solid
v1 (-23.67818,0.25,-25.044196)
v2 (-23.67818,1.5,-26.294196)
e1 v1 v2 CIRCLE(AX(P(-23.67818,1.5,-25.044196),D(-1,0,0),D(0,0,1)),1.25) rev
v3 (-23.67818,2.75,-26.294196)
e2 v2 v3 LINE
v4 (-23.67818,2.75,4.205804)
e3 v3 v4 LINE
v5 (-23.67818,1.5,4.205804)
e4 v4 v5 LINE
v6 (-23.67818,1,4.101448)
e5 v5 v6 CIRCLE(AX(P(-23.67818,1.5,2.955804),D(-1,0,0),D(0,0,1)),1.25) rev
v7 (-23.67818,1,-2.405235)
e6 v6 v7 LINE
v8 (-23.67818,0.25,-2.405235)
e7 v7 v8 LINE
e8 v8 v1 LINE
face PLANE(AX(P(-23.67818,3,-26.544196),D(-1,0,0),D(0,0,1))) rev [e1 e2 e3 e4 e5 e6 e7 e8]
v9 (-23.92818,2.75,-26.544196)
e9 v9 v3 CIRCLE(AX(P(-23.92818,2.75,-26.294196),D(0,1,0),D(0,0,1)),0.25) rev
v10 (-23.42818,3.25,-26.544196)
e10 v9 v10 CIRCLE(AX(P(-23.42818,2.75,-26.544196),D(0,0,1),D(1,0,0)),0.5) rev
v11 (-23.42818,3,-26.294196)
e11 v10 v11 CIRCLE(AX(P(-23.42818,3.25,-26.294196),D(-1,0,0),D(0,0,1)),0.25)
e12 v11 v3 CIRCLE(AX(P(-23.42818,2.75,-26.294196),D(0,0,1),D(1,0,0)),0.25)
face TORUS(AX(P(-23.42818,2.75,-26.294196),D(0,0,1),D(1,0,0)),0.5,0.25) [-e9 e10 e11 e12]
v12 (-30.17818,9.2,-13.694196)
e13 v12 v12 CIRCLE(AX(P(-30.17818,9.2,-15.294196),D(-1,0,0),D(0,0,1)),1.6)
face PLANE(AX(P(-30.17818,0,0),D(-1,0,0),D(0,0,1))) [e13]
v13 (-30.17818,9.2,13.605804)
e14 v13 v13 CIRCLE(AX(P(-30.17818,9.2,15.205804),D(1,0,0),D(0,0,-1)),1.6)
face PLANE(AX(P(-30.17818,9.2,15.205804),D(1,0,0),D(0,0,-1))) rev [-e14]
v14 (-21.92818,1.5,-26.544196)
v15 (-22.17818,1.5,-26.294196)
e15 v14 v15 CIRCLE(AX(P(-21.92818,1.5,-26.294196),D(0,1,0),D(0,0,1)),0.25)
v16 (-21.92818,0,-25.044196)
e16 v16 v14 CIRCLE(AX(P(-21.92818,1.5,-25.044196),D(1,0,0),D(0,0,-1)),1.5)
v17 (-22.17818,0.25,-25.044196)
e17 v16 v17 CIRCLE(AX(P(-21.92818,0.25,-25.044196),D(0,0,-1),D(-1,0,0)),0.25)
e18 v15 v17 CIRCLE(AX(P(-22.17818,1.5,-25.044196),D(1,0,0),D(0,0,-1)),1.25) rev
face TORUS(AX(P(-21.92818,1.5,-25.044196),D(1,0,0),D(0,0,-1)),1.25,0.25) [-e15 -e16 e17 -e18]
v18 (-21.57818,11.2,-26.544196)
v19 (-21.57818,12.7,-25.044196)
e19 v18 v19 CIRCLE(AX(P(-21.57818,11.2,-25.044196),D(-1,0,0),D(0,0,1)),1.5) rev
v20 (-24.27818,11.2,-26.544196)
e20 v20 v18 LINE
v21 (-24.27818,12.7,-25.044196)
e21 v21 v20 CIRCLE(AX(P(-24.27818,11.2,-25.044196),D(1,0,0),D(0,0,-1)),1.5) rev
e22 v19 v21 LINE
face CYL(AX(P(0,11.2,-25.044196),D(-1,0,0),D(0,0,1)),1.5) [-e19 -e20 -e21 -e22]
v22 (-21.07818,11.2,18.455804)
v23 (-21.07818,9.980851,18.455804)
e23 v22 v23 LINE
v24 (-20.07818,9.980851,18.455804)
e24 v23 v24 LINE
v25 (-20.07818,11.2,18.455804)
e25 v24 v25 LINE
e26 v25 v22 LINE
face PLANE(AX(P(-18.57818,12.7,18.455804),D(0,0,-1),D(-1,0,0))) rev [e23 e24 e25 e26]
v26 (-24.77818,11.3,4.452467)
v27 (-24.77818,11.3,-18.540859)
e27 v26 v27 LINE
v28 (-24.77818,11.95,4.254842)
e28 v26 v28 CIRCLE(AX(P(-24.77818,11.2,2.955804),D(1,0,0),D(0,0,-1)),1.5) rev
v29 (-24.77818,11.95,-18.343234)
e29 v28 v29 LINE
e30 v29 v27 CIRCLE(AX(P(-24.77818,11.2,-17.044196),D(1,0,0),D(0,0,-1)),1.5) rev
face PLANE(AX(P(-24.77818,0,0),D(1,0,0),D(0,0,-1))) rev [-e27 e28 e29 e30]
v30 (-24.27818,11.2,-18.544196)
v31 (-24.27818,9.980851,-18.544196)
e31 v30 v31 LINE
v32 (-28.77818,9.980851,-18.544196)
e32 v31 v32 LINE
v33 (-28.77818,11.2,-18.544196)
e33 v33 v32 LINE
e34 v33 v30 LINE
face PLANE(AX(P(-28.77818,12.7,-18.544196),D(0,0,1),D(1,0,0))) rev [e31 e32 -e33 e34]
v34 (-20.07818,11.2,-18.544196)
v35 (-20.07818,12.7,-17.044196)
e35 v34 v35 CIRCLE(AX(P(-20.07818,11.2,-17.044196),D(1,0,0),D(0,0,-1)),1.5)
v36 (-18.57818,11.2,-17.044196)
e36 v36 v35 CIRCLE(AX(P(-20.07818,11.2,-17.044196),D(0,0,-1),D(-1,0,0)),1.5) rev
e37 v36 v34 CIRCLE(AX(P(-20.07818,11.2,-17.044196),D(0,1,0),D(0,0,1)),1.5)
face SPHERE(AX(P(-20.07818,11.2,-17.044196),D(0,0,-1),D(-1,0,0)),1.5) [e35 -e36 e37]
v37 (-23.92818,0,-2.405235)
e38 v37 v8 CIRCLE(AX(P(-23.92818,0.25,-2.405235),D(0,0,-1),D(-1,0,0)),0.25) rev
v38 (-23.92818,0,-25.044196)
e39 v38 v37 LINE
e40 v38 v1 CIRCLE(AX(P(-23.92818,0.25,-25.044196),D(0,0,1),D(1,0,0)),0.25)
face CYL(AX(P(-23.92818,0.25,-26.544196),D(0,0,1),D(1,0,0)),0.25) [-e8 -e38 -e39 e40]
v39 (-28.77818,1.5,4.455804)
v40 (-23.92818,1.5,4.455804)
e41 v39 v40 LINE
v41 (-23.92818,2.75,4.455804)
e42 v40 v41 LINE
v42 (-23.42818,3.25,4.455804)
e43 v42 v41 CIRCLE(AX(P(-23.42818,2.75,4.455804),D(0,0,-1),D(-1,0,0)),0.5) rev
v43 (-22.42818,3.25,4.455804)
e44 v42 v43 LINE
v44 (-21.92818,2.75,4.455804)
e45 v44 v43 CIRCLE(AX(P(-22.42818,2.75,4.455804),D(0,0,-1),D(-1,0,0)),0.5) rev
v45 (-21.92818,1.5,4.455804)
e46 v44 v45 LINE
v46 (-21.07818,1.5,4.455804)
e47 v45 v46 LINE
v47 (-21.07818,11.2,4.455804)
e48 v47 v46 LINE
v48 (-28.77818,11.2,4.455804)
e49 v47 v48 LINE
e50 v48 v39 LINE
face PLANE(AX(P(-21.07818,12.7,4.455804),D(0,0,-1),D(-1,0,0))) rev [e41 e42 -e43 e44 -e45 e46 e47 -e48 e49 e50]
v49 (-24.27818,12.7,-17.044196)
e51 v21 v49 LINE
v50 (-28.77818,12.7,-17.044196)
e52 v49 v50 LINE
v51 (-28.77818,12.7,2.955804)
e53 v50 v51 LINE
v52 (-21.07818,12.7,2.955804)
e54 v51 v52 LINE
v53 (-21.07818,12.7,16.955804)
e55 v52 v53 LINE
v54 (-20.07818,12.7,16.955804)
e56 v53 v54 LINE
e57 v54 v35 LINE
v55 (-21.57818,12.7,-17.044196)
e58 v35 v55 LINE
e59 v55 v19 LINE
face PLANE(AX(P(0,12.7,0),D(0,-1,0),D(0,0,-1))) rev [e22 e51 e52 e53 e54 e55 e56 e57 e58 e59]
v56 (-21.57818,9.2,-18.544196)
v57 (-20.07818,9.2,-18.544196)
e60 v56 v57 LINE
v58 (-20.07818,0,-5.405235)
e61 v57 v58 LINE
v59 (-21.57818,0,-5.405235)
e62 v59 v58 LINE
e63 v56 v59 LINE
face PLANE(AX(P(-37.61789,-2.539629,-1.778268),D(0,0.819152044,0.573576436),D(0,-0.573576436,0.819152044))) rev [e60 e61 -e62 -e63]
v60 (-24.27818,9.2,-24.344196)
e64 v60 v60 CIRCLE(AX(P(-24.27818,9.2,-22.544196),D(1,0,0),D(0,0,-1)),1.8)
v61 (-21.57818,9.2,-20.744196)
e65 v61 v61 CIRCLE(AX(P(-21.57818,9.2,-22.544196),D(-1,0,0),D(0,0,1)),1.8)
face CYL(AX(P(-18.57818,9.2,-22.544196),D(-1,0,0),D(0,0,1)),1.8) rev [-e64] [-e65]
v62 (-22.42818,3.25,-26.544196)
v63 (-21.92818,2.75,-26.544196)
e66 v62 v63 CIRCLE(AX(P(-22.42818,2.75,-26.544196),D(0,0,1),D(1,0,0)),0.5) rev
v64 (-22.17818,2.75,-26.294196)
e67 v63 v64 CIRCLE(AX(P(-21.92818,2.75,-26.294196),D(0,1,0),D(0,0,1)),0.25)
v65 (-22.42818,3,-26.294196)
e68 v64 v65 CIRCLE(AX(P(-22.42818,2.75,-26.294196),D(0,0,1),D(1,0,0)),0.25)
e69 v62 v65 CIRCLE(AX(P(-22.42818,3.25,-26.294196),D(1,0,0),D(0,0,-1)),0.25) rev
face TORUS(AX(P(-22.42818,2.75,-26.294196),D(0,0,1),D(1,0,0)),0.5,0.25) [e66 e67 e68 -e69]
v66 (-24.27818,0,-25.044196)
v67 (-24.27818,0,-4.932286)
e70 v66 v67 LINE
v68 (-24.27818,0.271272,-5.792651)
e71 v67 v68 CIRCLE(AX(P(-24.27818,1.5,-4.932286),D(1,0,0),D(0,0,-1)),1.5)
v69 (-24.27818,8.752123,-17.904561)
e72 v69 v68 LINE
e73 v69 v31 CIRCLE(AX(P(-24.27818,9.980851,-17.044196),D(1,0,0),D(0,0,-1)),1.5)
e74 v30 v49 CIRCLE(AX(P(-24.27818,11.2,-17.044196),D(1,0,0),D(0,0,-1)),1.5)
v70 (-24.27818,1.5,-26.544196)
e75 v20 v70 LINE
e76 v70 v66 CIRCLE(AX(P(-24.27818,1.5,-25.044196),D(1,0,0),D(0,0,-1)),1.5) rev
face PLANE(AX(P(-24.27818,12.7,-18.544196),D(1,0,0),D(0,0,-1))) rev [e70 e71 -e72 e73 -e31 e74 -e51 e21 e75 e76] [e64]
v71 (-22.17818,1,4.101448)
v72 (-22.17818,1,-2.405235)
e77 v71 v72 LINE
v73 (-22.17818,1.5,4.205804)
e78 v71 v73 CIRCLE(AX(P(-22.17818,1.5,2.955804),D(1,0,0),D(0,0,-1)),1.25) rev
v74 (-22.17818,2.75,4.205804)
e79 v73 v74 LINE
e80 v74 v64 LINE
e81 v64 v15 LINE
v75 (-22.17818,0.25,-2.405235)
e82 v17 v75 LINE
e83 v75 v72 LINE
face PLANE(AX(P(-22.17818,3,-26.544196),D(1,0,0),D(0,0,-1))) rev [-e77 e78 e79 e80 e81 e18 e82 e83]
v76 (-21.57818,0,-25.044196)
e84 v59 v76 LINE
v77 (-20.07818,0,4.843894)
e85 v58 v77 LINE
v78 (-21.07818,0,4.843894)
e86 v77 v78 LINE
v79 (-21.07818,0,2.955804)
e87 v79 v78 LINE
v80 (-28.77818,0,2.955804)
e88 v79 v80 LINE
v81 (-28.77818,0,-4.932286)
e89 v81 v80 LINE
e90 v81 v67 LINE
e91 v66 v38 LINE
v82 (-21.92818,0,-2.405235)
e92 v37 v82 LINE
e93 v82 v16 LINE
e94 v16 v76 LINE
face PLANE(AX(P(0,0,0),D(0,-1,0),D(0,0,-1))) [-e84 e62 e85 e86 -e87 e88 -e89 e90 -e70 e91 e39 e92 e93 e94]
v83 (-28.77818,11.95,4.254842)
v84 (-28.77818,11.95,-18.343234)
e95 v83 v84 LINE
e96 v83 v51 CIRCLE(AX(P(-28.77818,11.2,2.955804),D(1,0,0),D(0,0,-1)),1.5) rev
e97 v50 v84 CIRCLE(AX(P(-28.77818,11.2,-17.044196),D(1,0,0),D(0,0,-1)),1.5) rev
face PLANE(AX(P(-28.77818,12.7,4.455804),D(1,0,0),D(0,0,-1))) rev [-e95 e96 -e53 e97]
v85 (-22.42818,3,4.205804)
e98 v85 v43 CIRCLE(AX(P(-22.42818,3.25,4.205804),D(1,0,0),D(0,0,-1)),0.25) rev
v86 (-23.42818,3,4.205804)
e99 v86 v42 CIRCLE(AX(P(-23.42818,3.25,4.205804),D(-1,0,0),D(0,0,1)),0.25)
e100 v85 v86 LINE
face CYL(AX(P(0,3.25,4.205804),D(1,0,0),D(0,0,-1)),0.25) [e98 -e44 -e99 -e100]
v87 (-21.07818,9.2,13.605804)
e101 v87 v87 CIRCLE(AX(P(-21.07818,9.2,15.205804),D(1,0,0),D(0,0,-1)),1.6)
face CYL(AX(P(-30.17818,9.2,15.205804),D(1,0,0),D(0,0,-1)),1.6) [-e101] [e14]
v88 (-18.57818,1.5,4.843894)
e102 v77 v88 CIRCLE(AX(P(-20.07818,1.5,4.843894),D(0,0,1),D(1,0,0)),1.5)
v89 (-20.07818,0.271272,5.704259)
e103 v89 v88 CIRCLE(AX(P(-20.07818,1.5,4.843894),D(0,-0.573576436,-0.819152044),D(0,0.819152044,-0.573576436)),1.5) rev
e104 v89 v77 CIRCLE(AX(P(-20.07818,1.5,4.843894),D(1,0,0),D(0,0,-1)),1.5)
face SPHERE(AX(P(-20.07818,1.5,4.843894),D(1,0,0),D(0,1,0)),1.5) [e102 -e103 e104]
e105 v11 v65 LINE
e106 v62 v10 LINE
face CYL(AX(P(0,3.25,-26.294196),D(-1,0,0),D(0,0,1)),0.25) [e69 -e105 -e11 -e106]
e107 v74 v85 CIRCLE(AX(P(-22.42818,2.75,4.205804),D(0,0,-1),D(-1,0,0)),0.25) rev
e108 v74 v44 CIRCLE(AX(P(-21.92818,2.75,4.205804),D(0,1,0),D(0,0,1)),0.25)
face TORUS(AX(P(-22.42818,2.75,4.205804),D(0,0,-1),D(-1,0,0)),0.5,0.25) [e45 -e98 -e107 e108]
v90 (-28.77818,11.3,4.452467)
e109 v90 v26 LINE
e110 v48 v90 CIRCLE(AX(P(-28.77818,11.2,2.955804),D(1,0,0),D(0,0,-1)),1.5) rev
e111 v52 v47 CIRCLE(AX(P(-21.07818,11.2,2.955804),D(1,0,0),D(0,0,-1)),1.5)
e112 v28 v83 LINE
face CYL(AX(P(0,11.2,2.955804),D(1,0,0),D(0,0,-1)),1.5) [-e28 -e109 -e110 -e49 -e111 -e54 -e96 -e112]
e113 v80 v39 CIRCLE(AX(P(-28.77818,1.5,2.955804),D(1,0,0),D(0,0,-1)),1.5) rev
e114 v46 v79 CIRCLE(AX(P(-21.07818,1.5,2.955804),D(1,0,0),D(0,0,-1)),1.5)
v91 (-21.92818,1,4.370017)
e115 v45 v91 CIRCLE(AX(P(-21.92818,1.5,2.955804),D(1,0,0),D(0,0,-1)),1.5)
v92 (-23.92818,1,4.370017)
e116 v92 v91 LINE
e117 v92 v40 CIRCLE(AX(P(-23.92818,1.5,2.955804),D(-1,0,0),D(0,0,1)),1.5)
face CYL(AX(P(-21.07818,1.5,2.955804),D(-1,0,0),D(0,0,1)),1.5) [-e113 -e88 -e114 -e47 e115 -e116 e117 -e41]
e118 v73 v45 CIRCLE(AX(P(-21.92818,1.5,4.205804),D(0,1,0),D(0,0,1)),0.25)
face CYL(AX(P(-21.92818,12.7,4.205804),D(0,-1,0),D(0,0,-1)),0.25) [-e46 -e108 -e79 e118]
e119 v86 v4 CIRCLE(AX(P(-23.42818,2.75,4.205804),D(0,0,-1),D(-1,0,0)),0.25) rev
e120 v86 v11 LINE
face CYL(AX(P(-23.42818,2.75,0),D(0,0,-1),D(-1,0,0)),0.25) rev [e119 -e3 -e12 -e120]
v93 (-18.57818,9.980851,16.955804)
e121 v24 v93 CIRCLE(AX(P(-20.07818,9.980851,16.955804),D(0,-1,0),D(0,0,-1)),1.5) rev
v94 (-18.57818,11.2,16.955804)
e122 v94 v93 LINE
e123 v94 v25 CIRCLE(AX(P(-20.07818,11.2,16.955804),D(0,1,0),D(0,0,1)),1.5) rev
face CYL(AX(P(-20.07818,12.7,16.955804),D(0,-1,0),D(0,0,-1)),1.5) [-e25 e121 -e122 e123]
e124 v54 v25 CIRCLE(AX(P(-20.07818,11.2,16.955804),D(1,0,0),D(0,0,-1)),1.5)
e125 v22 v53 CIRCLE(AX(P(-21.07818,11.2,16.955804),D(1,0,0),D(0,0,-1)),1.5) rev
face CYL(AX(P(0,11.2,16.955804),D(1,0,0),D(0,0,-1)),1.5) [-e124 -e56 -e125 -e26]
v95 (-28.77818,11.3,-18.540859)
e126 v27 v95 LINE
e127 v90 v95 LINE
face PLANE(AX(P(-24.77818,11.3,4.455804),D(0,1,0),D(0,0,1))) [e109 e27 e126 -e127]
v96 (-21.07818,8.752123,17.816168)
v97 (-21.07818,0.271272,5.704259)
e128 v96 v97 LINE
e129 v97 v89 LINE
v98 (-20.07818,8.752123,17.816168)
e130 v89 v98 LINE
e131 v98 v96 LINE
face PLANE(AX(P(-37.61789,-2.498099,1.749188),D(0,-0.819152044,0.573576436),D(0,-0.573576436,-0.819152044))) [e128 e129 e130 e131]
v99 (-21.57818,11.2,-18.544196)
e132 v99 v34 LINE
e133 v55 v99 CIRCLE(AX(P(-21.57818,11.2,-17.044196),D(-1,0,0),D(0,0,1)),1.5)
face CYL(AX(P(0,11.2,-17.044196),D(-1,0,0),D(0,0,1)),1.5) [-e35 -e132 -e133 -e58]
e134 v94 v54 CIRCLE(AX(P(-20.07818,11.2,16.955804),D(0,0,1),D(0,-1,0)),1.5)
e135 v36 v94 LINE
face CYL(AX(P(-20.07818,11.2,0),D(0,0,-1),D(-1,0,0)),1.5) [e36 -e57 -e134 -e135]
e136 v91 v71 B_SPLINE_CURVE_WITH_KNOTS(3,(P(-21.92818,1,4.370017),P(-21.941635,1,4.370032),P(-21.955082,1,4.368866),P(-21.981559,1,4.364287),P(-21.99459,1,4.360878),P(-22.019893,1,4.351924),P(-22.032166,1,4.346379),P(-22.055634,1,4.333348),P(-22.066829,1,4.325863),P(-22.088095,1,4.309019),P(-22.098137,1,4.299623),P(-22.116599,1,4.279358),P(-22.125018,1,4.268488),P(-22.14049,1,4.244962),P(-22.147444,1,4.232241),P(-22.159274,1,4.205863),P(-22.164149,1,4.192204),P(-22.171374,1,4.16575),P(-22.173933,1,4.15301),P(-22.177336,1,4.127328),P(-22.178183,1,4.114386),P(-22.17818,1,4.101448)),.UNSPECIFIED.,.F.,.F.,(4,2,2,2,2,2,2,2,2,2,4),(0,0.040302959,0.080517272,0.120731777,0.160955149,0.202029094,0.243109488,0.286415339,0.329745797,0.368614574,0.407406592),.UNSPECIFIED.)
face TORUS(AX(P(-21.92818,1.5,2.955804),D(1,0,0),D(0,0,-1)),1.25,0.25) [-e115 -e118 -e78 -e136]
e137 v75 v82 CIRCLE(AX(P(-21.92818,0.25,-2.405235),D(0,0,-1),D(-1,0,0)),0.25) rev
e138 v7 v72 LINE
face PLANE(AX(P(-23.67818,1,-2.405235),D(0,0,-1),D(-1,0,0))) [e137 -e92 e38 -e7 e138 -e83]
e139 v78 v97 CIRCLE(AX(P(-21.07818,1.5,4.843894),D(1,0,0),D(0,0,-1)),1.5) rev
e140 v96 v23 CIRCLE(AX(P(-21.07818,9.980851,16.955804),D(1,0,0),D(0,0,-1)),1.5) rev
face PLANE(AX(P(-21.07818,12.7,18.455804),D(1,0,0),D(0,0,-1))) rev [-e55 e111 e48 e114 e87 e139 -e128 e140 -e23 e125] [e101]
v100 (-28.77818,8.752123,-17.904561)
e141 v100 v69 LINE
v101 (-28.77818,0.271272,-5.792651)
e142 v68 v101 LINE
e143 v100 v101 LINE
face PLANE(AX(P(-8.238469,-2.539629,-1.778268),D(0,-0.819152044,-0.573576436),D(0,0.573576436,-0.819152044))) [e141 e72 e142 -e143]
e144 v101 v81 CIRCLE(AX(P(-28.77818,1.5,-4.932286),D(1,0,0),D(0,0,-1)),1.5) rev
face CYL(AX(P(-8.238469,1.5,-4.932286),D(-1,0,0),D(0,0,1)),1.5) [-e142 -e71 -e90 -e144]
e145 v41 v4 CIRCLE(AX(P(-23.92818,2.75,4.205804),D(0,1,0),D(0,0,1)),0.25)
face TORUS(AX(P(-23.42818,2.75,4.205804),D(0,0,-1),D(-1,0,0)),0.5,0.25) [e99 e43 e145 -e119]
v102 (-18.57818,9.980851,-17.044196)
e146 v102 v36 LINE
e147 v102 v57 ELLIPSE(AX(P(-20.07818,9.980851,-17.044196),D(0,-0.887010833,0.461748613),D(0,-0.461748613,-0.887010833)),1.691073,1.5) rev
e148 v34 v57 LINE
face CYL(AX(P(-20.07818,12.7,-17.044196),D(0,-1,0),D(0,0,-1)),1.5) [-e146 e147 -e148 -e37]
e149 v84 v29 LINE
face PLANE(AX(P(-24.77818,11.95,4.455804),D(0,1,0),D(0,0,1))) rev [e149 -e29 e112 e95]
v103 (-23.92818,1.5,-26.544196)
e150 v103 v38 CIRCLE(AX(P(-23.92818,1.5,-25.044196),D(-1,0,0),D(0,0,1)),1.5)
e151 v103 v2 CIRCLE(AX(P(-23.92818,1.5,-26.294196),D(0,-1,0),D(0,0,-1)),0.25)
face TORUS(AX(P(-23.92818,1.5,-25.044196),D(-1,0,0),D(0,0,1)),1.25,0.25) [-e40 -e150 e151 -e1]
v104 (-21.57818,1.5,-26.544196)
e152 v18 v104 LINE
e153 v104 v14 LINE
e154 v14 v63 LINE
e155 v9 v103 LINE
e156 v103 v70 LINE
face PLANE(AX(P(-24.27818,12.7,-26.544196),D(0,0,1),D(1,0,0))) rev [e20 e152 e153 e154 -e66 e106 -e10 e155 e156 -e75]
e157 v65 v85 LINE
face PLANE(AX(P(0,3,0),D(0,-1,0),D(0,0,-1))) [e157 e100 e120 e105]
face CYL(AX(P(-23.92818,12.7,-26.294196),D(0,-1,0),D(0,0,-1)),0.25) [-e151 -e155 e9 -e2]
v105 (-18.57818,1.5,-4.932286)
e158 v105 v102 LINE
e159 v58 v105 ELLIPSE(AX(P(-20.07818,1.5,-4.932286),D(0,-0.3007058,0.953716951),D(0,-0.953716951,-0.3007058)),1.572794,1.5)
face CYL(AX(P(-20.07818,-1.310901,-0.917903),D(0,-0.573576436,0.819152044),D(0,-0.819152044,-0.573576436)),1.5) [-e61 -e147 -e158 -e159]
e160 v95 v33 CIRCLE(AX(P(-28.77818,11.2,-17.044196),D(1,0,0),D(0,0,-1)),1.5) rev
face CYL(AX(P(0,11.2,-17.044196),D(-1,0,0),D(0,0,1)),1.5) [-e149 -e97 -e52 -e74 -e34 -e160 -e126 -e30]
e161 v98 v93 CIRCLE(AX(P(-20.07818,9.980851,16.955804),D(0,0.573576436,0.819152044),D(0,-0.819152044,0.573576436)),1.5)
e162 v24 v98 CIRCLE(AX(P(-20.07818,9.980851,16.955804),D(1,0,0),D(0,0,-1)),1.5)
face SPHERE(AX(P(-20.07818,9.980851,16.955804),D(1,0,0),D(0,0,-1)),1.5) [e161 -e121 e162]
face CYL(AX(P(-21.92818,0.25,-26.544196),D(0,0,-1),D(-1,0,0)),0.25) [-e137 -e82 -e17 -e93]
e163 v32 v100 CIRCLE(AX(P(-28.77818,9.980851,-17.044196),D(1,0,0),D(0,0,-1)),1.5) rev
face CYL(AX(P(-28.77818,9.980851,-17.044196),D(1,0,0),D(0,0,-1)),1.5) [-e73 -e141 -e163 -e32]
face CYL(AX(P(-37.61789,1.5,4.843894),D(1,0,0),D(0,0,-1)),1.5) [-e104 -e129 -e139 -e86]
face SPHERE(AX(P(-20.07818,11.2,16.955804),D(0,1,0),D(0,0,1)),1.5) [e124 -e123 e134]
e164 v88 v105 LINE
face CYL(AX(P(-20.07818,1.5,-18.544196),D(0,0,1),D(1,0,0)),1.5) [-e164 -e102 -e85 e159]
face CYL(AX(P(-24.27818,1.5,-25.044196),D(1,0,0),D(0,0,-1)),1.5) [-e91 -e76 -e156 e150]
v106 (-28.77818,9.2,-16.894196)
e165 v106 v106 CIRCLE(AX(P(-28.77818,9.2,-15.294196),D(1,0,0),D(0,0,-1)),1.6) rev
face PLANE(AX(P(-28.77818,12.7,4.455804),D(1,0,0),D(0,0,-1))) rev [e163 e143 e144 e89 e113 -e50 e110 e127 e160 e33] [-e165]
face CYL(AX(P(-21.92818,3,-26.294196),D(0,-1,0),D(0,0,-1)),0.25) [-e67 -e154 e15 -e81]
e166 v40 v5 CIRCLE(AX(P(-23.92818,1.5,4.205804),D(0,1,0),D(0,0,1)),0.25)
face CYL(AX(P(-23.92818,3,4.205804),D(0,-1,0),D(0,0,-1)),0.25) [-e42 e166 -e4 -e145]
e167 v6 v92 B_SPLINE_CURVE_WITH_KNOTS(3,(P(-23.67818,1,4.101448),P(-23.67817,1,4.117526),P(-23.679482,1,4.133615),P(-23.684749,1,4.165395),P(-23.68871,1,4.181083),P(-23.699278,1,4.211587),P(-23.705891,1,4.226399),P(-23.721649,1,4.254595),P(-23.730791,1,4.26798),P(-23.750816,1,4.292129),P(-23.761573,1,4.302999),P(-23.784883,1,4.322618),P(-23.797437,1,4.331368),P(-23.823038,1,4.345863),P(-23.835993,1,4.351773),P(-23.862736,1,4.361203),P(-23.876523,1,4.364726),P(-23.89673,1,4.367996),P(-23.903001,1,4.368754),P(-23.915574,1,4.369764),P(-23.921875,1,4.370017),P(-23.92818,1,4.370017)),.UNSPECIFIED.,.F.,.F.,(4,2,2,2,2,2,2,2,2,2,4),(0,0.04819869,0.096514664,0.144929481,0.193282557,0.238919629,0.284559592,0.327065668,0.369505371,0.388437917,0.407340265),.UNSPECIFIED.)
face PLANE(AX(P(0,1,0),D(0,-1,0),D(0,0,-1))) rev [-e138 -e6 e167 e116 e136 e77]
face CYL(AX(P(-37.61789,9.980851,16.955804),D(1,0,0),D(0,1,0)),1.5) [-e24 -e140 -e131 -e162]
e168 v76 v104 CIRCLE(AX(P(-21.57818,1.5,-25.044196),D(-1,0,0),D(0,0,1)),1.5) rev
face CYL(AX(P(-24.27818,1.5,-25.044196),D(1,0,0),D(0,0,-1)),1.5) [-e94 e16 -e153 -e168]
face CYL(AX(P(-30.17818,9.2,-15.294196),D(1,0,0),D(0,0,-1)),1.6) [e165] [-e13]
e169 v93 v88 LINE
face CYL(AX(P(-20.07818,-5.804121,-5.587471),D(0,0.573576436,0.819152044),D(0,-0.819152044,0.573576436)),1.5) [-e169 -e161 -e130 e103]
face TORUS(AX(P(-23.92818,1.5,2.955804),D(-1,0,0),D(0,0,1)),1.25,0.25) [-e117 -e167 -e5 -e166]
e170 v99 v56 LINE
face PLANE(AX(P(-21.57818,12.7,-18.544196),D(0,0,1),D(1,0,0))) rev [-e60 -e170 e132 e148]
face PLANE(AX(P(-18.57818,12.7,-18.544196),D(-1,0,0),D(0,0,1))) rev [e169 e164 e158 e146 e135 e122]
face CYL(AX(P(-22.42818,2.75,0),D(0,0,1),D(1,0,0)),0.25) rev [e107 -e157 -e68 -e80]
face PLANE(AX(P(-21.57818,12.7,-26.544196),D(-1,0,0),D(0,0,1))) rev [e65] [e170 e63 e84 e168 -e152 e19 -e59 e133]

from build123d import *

# Parameters (mm, degrees)
BOSS_EXTRUDE1_DEPTH = 12.7
CUT_EXTRUDE2_DEPTH  = 4.5
CUT_EXTRUDE3_DEPTH  = 32.143608507
BOSS_EXTRUDE2_START = -7.7
SKETCH2_5_R         = 1.6
BOSS_EXTRUDE2_DEPTH = 9.1
SKETCH2_6_R         = 1.8
CUT_EXTRUDE4_DEPTH  = 32.143608507
SKETCH2_7_R         = 1.6
BOSS_EXTRUDE3_DEPTH = 1.4
SKETCH2_8_W         = 45
SKETCH2_8_H         = 0.65
CUT_EXTRUDE5_DEPTH  = 4
CUT_EXTRUDE6_REACH  = 33.63
SKETCH4_W           = 1.5
SKETCH4_H           = 31
CUT_EXTRUDE7_DEPTH  = 3
SKETCH6_W           = 2.1
SKETCH6_H           = 6.861038338
BOSS_EXTRUDE4_DEPTH = 1
CUT_EXTRUDE8_DEPTH  = 4.5
FILLET1_R           = 1.5
FILLET2_R           = 0.25


with BuildPart() as part:
    # Sketch1 → Boss-Extrude1 (new body)
    with BuildSketch(Plane(origin=(0, 0, 0), x_dir=(1, 0, 0), z_dir=(0, 1, 0))):
        Polygon((-28.77817965, 18.54419618), (-24.27817965, 18.54419618), (-24.27817965, 26.54419618), (-21.57817965, 26.54419618), (-21.57817965, 18.54419618), (-18.57817965, 18.54419618), (-18.57817965, -18.45580382), (-21.07817965, -18.45580382), (-21.07817965, -4.45580382), (-28.77817965, -4.45580382), align=None)
    extrude(amount=BOSS_EXTRUDE1_DEPTH)

    # Sketch2 → Cut-Extrude2 (cut)
    with BuildSketch(Plane.ZY.offset(28.77817965)):
        Polygon((-18.54419618, 5.764870839), (-18.54419618, 0), (-7.040359819, 0), align=None)
    extrude(amount=-CUT_EXTRUDE2_DEPTH, mode=Mode.SUBTRACT)

    # Sketch2<4> → Cut-Extrude3 (cut, through all)
    with BuildSketch(Plane.ZY.offset(28.77817965)):
        Polygon((15.124702683, 0), (18.45580382, 0), (18.45580382, 9.2), align=None)
    extrude(amount=-CUT_EXTRUDE3_DEPTH, mode=Mode.SUBTRACT)

    # Sketch2<5> → Boss-Extrude2 (add)
    with BuildSketch(Plane.ZY.offset(28.77817965).offset(BOSS_EXTRUDE2_START)):
        with Locations(Location((15.20580382, 9.2, 0), (0, 0, 180))):
            Circle(SKETCH2_5_R)
    extrude(amount=BOSS_EXTRUDE2_DEPTH)

    # Sketch2<6> → Cut-Extrude4 (cut, through all)
    with BuildSketch(Plane.ZY.offset(28.77817965)):
        with Locations((-22.54419618, 9.2)):
            Circle(SKETCH2_6_R)
    extrude(amount=-CUT_EXTRUDE4_DEPTH, mode=Mode.SUBTRACT)

    # Sketch2<7> → Boss-Extrude3 (add)
    with BuildSketch(Plane.ZY.offset(28.77817965)):
        with Locations(Location((-15.29419618, 9.2, 0), (0, 0, 180))):
            Circle(SKETCH2_7_R)
    extrude(amount=BOSS_EXTRUDE3_DEPTH)

    # Sketch2<8> → Cut-Extrude5 (cut)
    with BuildSketch(Plane.ZY.offset(28.77817965)):
        with Locations((-4.04419618, 11.625)):
            Rectangle(SKETCH2_8_W, SKETCH2_8_H)
    extrude(amount=-CUT_EXTRUDE5_DEPTH, mode=Mode.SUBTRACT)

    # Cut-Extrude6: up to this face of the body (flat: up to its plane)
    cut_extrude6_end = Plane(part.part.faces().sort_by_distance((-21.57817965, 6.032683514, -22.54419618))[0])
    # Sketch3 → Cut-Extrude6 (cut, up to the picked face)
    with BuildSketch(Plane(origin=(-18.57817965, 0, 0), x_dir=(0, 0, -1), z_dir=(1, 0, 0)), mode=Mode.PRIVATE) as cut_extrude6_sk1:
        Polygon((18.54419618, 0), (18.54419618, 9.2), (5.405234518, 0), align=None)
    cut_extrude6_tool1 = split(extrude(cut_extrude6_sk1.sketch, amount=-CUT_EXTRUDE6_REACH, mode=Mode.PRIVATE), bisect_by=cut_extrude6_end, keep=Keep.BOTH, mode=Mode.PRIVATE)
    # Sketch3 → Cut-Extrude6 (cut, up to the picked face)
    with BuildSketch(Plane(origin=(-18.57817965, 0, 0), x_dir=(0, 0, -1), z_dir=(1, 0, 0)), mode=Mode.PRIVATE) as cut_extrude6_sk2:
        Polygon((-15.124702683, 0), (-18.45580382, 9.2), (-18.45580382, 0), align=None)
    cut_extrude6_tool2 = split(extrude(cut_extrude6_sk2.sketch, amount=-CUT_EXTRUDE6_REACH, mode=Mode.PRIVATE), bisect_by=cut_extrude6_end, keep=Keep.BOTH, mode=Mode.PRIVATE)
    # Sketch3 → Cut-Extrude6 (cut, up to the picked face)
    with BuildSketch(Plane(origin=(-18.57817965, 0, 0), x_dir=(0, 0, -1), z_dir=(1, 0, 0)), mode=Mode.PRIVATE) as cut_extrude6_sk3:
        Polygon((-5.316842158, 0), (-18.45580382, 9.2), (-15.124702683, 0), align=None)
    cut_extrude6_tool3 = split(extrude(cut_extrude6_sk3.sketch, amount=-CUT_EXTRUDE6_REACH, mode=Mode.PRIVATE), bisect_by=cut_extrude6_end, keep=Keep.BOTH, mode=Mode.PRIVATE)
    add(cut_extrude6_tool1.solids().sort_by(Axis((-18.57818, 3.066667, -14.164542), (-1, 0, 0)))[0], mode=Mode.SUBTRACT)
    add(cut_extrude6_tool2.solids().sort_by(Axis((-18.57818, 3.066667, 17.345437), (-1, 0, 0)))[0], mode=Mode.SUBTRACT)
    add(cut_extrude6_tool3.solids().sort_by(Axis((-18.57818, 3.066667, 12.965783), (-1, 0, 0)))[0], mode=Mode.SUBTRACT)

    # Sketch4 → Cut-Extrude7 (cut)
    with BuildSketch(Plane.XZ):
        with Locations((-22.92817965, -11.04419618)):
            Rectangle(SKETCH4_W, SKETCH4_H)
    extrude(amount=-CUT_EXTRUDE7_DEPTH, mode=Mode.SUBTRACT)

    # Sketch6 → Boss-Extrude4 (add)
    with BuildSketch(Plane(origin=(0, 0, 0), x_dir=(-1, 0, 0), z_dir=(0, -1, 0))):
        with Locations((22.62817965, -1.025284651)):
            Rectangle(SKETCH6_W, SKETCH6_H)
    extrude(amount=-BOSS_EXTRUDE4_DEPTH)

    # Sketch8 → Cut-Extrude8 (cut)
    with BuildSketch(Plane.ZY.offset(28.77817965)):
        Polygon((-18.54419618, 0), (-7.040359819, 0), (-18.54419618, 5.764870839), align=None)
        Polygon((-7.040359819, 0), (-5.405234518, 0), (-18.54419618, 9.2), (-18.54419618, 5.764870839), align=None)
    extrude(amount=-CUT_EXTRUDE8_DEPTH, mode=Mode.SUBTRACT)

    # Fillet1
    # the kernel refuses this fillet: 1.5 mm, written as the material it takes off along each edge
    with BuildSketch(Plane(origin=(-20.07817965, 9.980850576, 16.95580382), x_dir=(0, 0, 1), z_dir=(1, 0, 0))) as fillet1_piece_1_section:
        Polygon((0, 0), (FILLET1_R, 0), (FILLET1_R, FILLET1_R * 0.520567050552), (FILLET1_R * 0.573576436351, FILLET1_R * 0.819152044289), align=None)
    fillet1_piece_1 = extrude(amount=FILLET1_R, mode=Mode.PRIVATE)
    fillet1_piece_1 = fillet1_piece_1 - Plane(origin=(-20.07817965, 9.980850576, 16.95580382), x_dir=(0, 0.4617486132350316, -0.8870108331782229), z_dir=(1, 0, 0)) * Sphere(FILLET1_R, mode=Mode.PRIVATE)
    add(fillet1_piece_1, mode=Mode.SUBTRACT)
    with BuildSketch(Plane(origin=(-20.07817965, 11.2, 16.95580382), x_dir=(1, 0, 0), z_dir=(0, 1, 0))) as fillet1_piece_2_section:
        Polygon((0, 0), (FILLET1_R, 0), (FILLET1_R, -FILLET1_R), (0, -FILLET1_R), align=None)
    fillet1_piece_2 = extrude(amount=FILLET1_R, mode=Mode.PRIVATE)
    fillet1_piece_2 = fillet1_piece_2 - Plane(origin=(-20.07817965, 11.2, 16.95580382), x_dir=(-0.7071067811865476, 0, -0.7071067811865475), z_dir=(0, 1, 0)) * Sphere(FILLET1_R, mode=Mode.PRIVATE)
    add(fillet1_piece_2, mode=Mode.SUBTRACT)
    with BuildSketch(Plane(origin=(-20.07817965, 1.5, 4.843893974), x_dir=(0, -0.8191520442889888, 0.5735764363510504), z_dir=(1, 0, 0))) as fillet1_piece_3_section:
        Polygon((0, 0), (FILLET1_R, 0), (FILLET1_R, FILLET1_R * 0.315298788879), (FILLET1_R * 0.819152044289, FILLET1_R * 0.573576436351), align=None)
    fillet1_piece_3 = extrude(amount=FILLET1_R, mode=Mode.PRIVATE)
    fillet1_piece_3 = fillet1_piece_3 - Plane(origin=(-20.07817965, 1.5, 4.843893974), x_dir=(0, 0.9537169507482262, -0.3007057995042756), z_dir=(1, 0, 0)) * Sphere(FILLET1_R, mode=Mode.PRIVATE)
    add(fillet1_piece_3, mode=Mode.SUBTRACT)
    with BuildSketch(Plane(origin=(-20.07817965, 11.2, -17.04419618), x_dir=(1, 0, 0), z_dir=(0, 1, 0))) as fillet1_piece_4_section:
        Polygon((0, 0), (FILLET1_R, 0), (FILLET1_R, FILLET1_R), (0, FILLET1_R), align=None)
    fillet1_piece_4 = extrude(amount=FILLET1_R, mode=Mode.PRIVATE)
    fillet1_piece_4 = fillet1_piece_4 - Plane(origin=(-20.07817965, 11.2, -17.04419618), x_dir=(-0.7071067811865475, 0, 0.7071067811865477), z_dir=(0, 1, 0)) * Sphere(FILLET1_R, mode=Mode.PRIVATE)
    add(fillet1_piece_4, mode=Mode.SUBTRACT)
    with BuildSketch(Plane(origin=(-21.07817965, 0, 4.45580382), x_dir=(0, 1, 0), z_dir=(-1, 0, 0))) as fillet1_piece_5:
        with BuildLine():
            CenterArc((FILLET1_R, FILLET1_R), FILLET1_R, 180, 90)
            Line((0, FILLET1_R), (0, 0))
            Line((0, 0), (FILLET1_R, 0))
        make_face()
    extrude(amount=11.45, mode=Mode.SUBTRACT)
    with BuildSketch(Plane(origin=(-21.07817965, 12.7, 4.45580382), x_dir=(0, -1, 0), z_dir=(-1, 0, 0))) as fillet1_piece_6:
        with BuildLine():
            CenterArc((FILLET1_R, -FILLET1_R), FILLET1_R, 90, 90)
            Line((0, -FILLET1_R), (0, 0))
            Line((0, 0), (FILLET1_R, 0))
        make_face()
    extrude(amount=11.45, mode=Mode.SUBTRACT)
    with BuildSketch(Plane(origin=(-25.92817965, 0, -26.54419618), x_dir=(0, 1, 0), z_dir=(1, 0, 0)), Plane(origin=(-28.02817965, 0, -26.54419618), x_dir=(0, 1, 0), z_dir=(1, 0, 0))) as fillet1_piece_7:
        with BuildLine():
            CenterArc((FILLET1_R, FILLET1_R), FILLET1_R, 180, 90)
            Line((0, FILLET1_R), (0, 0))
            Line((0, 0), (FILLET1_R, 0))
        make_face()
    extrude(amount=8.1, mode=Mode.SUBTRACT)
    with BuildSketch(Plane(origin=(-28.02817965, 12.7, -26.54419618), x_dir=(0, -1, 0), z_dir=(1, 0, 0))) as fillet1_piece_8:
        with BuildLine():
            CenterArc((FILLET1_R, -FILLET1_R), FILLET1_R, 90, 90)
            Line((0, -FILLET1_R), (0, 0))
            Line((0, 0), (FILLET1_R, 0))
        make_face()
    extrude(amount=10.2, mode=Mode.SUBTRACT)
    with BuildSketch(Plane(origin=(-18.57817965, 9.980850576, 18.45580382), x_dir=(0, 0, -1), z_dir=(0, 1, 0))) as fillet1_piece_9:
        with BuildLine():
            CenterArc((FILLET1_R, FILLET1_R), FILLET1_R, 180, 90)
            Line((0, FILLET1_R), (0, 0))
            Line((0, 0), (FILLET1_R, 0))
        make_face()
    extrude(amount=1.219149424, mode=Mode.SUBTRACT)
    with BuildSketch(Plane(origin=(-23.03030609, 9.2, 18.45580382), x_dir=(0, 1, 0), z_dir=(1, 0, 0))) as fillet1_piece_10:
        with BuildLine():
            CenterArc((FILLET1_R * 0.520567050552, -FILLET1_R), FILLET1_R, 90, 55)
            Line((-FILLET1_R * 0.298584993737, -FILLET1_R * 0.426423563649), (0, 0))
            Line((0, 0), (FILLET1_R * 0.520567050552, 0))
        make_face()
    extrude(amount=2.95212644, mode=Mode.SUBTRACT)
    with BuildSketch(Plane(origin=(-20.07817965, 12.7, 18.45580382), x_dir=(0, -1, 0), z_dir=(-1, 0, 0))) as fillet1_piece_11:
        with BuildLine():
            CenterArc((FILLET1_R, -FILLET1_R), FILLET1_R, 90, 90)
            Line((0, -FILLET1_R), (0, 0))
            Line((0, 0), (FILLET1_R, 0))
        make_face()
    extrude(amount=4.75, mode=Mode.SUBTRACT)
    with BuildSketch(Plane(origin=(-20.07817965, 0, 5.316842158), x_dir=(0, 0.5735764363510512, 0.8191520442889884), z_dir=(-1, 0, 0))) as fillet1_piece_12:
        with BuildLine():
            CenterArc((FILLET1_R * 0.315298788879, FILLET1_R), FILLET1_R, 235, 35)
            Line((-FILLET1_R * 0.258277647472, FILLET1_R * 0.180847955711), (0, 0))
            Line((0, 0), (FILLET1_R * 0.315298788879, 0))
        make_face()
    extrude(amount=2.182370458, mode=Mode.SUBTRACT)
    with BuildSketch(Plane(origin=(-18.57817965, 0.271271934, 5.704258629), x_dir=(0, 0.8191520442889888, -0.5735764363510504), z_dir=(0, 0.5735764363510504, 0.8191520442889888))) as fillet1_piece_13:
        with BuildLine():
            CenterArc((FILLET1_R, FILLET1_R), FILLET1_R, 180, 90)
            Line((0, FILLET1_R), (0, 0))
            Line((0, 0), (FILLET1_R, 0))
        make_face()
    extrude(amount=14.785911761, mode=Mode.SUBTRACT)
    with BuildSketch(Plane(origin=(-18.57817965, 0, -9.155234518), x_dir=(0, 1, 0), z_dir=(0, 0, 1))) as fillet1_piece_14:
        with BuildLine():
            CenterArc((FILLET1_R, FILLET1_R), FILLET1_R, 180, 90)
            Line((0, FILLET1_R), (0, 0))
            Line((0, 0), (FILLET1_R, 0))
        make_face()
    extrude(amount=13.999128493, mode=Mode.SUBTRACT)
    with BuildSketch(Plane(origin=(-18.57817965, 11.350911636, -21.616016346), x_dir=(-1, 0, 0), z_dir=(0, -0.5735764363510504, 0.8191520442889889))) as fillet1_piece_15:
        with BuildLine():
            CenterArc((FILLET1_R, -FILLET1_R), FILLET1_R, 90, 90)
            Line((0, -FILLET1_R), (0, 0))
            Line((0, 0), (FILLET1_R, 0))
        make_face()
    extrude(amount=23.53971052, mode=Mode.SUBTRACT)
    with BuildSketch(Plane(origin=(-18.57817965, 5.45, -18.54419618), x_dir=(0, 0, 1), z_dir=(0, 1, 0))) as fillet1_piece_16:
        with BuildLine():
            CenterArc((FILLET1_R, -FILLET1_R), FILLET1_R, 90, 90)
            Line((0, -FILLET1_R), (0, 0))
            Line((0, 0), (FILLET1_R, 0))
        make_face()
    extrude(amount=5.75, mode=Mode.SUBTRACT)
    with BuildSketch(Plane(origin=(-32.52817965, 12.7, -18.54419618), x_dir=(0, 0, 1), z_dir=(1, 0, 0))) as fillet1_piece_17:
        with BuildLine():
            CenterArc((FILLET1_R, FILLET1_R), FILLET1_R, 180, 90)
            Line((0, FILLET1_R), (0, 0))
            Line((0, 0), (FILLET1_R, 0))
        make_face()
    extrude(amount=8.25, mode=Mode.SUBTRACT)
    with BuildSketch(Plane(origin=(-32.52817965, 12.7, -18.54419618), x_dir=(0, 0, 1), z_dir=(1, 0, 0))) as fillet1_piece_18_section:
        with BuildLine():
            CenterArc((FILLET1_R, FILLET1_R), FILLET1_R, 180, 90)
            Line((0, FILLET1_R), (0, 0))
            Line((0, 0), (FILLET1_R, 0))
        make_face()
    fillet1_piece_18 = extrude(amount=12, mode=Mode.PRIVATE)
    fillet1_piece_18 = split(fillet1_piece_18, bisect_by=Plane(origin=(-21.57817965, 12.360407329, -18.204603509), z_dir=(1, 0, 0)), keep=Keep.TOP, mode=Mode.PRIVATE)
    add(fillet1_piece_18, mode=Mode.SUBTRACT)
    with BuildSketch(Plane(origin=(-25.32817965, 12.7, -18.54419618), x_dir=(0, -1, 0), z_dir=(1, 0, 0))) as fillet1_piece_19_section:
        with BuildLine():
            CenterArc((FILLET1_R, -FILLET1_R), FILLET1_R, 90, 90)
            Line((0, -FILLET1_R), (0, 0))
            Line((0, 0), (FILLET1_R, 0))
        make_face()
    fillet1_piece_19 = extrude(amount=5.25, mode=Mode.PRIVATE)
    fillet1_piece_19 = split(fillet1_piece_19, bisect_by=Plane(origin=(-24.27817965, 12.360407329, -18.204603509), z_dir=(-1, 0, 0)), keep=Keep.TOP, mode=Mode.PRIVATE)
    add(fillet1_piece_19, mode=Mode.SUBTRACT)
    with BuildSketch(Plane(origin=(-21.57817965, 12.7, -18.54419618), x_dir=(0, -1, 0), z_dir=(1, 0, 0))) as fillet1_piece_20:
        with BuildLine():
            CenterArc((FILLET1_R, -FILLET1_R), FILLET1_R, 90, 90)
            Line((0, -FILLET1_R), (0, 0))
            Line((0, 0), (FILLET1_R, 0))
        make_face()
    extrude(amount=1.5, mode=Mode.SUBTRACT)
    with BuildSketch(Plane(origin=(-18.57817965, 12.7, -17.04419618), x_dir=(0, -1, 0), z_dir=(0, 0, 1))) as fillet1_piece_21:
        with BuildLine():
            CenterArc((FILLET1_R, -FILLET1_R), FILLET1_R, 90, 90)
            Line((0, -FILLET1_R), (0, 0))
            Line((0, 0), (FILLET1_R, 0))
        make_face()
    extrude(amount=34, mode=Mode.SUBTRACT)
    with BuildSketch(Plane(origin=(-29.960550109, 0, -5.405234518), x_dir=(0, 0.5735764363510492, -0.8191520442889897), z_dir=(1, 0, 0))) as fillet1_piece_22:
        with BuildLine():
            CenterArc((FILLET1_R * 0.315298788879, FILLET1_R), FILLET1_R, 235, 35)
            Line((-FILLET1_R * 0.258277647472, FILLET1_R * 0.180847955711), (0, 0))
            Line((0, 0), (FILLET1_R * 0.315298788879, 0))
        make_face()
    extrude(amount=5.682370458, mode=Mode.SUBTRACT)
    with BuildSketch(Plane(origin=(-30.73030609, 9.2, -18.54419618), x_dir=(0, 1, 0), z_dir=(1, 0, 0))) as fillet1_piece_23:
        with BuildLine():
            CenterArc((FILLET1_R * 0.520567050552, FILLET1_R), FILLET1_R, 215, 55)
            Line((-FILLET1_R * 0.298584993737, FILLET1_R * 0.426423563649), (0, 0))
            Line((0, 0), (FILLET1_R * 0.520567050552, 0))
        make_face()
    extrude(amount=6.45212644, mode=Mode.SUBTRACT)

    # Fillet2
    fillet2_edges = [part.edges().sort_by_distance(p)[0] for p in [
        (-22.17817965, 3, -11.04419618),
        (-22.17817965, 2.25, 4.45580382),
        (-22.92817965, 3, -26.54419618),
        (-22.17817965, 2.25, -26.54419618),
        (-23.67817965, 3, -11.04419618),
        (-23.67817965, 2.25, -26.54419618),
        (-22.92817965, 3, 4.45580382),
        (-23.67817965, 2.25, 4.45580382),
        (-23.67817965, 0, -13.724715349),
        (-22.17817965, 0, -13.724715349),
        (-23.67817965, 0.439339828, -26.104856352),
        (-23.67817965, 1.246347032, 4.434201659),
        (-22.17817965, 0.439339828, -26.104856352),
        (-22.17817965, 1.246347032, 4.434201659),
    ]]
    fillet(fillet2_edges, radius=FILLET2_R)


solid = part.part
